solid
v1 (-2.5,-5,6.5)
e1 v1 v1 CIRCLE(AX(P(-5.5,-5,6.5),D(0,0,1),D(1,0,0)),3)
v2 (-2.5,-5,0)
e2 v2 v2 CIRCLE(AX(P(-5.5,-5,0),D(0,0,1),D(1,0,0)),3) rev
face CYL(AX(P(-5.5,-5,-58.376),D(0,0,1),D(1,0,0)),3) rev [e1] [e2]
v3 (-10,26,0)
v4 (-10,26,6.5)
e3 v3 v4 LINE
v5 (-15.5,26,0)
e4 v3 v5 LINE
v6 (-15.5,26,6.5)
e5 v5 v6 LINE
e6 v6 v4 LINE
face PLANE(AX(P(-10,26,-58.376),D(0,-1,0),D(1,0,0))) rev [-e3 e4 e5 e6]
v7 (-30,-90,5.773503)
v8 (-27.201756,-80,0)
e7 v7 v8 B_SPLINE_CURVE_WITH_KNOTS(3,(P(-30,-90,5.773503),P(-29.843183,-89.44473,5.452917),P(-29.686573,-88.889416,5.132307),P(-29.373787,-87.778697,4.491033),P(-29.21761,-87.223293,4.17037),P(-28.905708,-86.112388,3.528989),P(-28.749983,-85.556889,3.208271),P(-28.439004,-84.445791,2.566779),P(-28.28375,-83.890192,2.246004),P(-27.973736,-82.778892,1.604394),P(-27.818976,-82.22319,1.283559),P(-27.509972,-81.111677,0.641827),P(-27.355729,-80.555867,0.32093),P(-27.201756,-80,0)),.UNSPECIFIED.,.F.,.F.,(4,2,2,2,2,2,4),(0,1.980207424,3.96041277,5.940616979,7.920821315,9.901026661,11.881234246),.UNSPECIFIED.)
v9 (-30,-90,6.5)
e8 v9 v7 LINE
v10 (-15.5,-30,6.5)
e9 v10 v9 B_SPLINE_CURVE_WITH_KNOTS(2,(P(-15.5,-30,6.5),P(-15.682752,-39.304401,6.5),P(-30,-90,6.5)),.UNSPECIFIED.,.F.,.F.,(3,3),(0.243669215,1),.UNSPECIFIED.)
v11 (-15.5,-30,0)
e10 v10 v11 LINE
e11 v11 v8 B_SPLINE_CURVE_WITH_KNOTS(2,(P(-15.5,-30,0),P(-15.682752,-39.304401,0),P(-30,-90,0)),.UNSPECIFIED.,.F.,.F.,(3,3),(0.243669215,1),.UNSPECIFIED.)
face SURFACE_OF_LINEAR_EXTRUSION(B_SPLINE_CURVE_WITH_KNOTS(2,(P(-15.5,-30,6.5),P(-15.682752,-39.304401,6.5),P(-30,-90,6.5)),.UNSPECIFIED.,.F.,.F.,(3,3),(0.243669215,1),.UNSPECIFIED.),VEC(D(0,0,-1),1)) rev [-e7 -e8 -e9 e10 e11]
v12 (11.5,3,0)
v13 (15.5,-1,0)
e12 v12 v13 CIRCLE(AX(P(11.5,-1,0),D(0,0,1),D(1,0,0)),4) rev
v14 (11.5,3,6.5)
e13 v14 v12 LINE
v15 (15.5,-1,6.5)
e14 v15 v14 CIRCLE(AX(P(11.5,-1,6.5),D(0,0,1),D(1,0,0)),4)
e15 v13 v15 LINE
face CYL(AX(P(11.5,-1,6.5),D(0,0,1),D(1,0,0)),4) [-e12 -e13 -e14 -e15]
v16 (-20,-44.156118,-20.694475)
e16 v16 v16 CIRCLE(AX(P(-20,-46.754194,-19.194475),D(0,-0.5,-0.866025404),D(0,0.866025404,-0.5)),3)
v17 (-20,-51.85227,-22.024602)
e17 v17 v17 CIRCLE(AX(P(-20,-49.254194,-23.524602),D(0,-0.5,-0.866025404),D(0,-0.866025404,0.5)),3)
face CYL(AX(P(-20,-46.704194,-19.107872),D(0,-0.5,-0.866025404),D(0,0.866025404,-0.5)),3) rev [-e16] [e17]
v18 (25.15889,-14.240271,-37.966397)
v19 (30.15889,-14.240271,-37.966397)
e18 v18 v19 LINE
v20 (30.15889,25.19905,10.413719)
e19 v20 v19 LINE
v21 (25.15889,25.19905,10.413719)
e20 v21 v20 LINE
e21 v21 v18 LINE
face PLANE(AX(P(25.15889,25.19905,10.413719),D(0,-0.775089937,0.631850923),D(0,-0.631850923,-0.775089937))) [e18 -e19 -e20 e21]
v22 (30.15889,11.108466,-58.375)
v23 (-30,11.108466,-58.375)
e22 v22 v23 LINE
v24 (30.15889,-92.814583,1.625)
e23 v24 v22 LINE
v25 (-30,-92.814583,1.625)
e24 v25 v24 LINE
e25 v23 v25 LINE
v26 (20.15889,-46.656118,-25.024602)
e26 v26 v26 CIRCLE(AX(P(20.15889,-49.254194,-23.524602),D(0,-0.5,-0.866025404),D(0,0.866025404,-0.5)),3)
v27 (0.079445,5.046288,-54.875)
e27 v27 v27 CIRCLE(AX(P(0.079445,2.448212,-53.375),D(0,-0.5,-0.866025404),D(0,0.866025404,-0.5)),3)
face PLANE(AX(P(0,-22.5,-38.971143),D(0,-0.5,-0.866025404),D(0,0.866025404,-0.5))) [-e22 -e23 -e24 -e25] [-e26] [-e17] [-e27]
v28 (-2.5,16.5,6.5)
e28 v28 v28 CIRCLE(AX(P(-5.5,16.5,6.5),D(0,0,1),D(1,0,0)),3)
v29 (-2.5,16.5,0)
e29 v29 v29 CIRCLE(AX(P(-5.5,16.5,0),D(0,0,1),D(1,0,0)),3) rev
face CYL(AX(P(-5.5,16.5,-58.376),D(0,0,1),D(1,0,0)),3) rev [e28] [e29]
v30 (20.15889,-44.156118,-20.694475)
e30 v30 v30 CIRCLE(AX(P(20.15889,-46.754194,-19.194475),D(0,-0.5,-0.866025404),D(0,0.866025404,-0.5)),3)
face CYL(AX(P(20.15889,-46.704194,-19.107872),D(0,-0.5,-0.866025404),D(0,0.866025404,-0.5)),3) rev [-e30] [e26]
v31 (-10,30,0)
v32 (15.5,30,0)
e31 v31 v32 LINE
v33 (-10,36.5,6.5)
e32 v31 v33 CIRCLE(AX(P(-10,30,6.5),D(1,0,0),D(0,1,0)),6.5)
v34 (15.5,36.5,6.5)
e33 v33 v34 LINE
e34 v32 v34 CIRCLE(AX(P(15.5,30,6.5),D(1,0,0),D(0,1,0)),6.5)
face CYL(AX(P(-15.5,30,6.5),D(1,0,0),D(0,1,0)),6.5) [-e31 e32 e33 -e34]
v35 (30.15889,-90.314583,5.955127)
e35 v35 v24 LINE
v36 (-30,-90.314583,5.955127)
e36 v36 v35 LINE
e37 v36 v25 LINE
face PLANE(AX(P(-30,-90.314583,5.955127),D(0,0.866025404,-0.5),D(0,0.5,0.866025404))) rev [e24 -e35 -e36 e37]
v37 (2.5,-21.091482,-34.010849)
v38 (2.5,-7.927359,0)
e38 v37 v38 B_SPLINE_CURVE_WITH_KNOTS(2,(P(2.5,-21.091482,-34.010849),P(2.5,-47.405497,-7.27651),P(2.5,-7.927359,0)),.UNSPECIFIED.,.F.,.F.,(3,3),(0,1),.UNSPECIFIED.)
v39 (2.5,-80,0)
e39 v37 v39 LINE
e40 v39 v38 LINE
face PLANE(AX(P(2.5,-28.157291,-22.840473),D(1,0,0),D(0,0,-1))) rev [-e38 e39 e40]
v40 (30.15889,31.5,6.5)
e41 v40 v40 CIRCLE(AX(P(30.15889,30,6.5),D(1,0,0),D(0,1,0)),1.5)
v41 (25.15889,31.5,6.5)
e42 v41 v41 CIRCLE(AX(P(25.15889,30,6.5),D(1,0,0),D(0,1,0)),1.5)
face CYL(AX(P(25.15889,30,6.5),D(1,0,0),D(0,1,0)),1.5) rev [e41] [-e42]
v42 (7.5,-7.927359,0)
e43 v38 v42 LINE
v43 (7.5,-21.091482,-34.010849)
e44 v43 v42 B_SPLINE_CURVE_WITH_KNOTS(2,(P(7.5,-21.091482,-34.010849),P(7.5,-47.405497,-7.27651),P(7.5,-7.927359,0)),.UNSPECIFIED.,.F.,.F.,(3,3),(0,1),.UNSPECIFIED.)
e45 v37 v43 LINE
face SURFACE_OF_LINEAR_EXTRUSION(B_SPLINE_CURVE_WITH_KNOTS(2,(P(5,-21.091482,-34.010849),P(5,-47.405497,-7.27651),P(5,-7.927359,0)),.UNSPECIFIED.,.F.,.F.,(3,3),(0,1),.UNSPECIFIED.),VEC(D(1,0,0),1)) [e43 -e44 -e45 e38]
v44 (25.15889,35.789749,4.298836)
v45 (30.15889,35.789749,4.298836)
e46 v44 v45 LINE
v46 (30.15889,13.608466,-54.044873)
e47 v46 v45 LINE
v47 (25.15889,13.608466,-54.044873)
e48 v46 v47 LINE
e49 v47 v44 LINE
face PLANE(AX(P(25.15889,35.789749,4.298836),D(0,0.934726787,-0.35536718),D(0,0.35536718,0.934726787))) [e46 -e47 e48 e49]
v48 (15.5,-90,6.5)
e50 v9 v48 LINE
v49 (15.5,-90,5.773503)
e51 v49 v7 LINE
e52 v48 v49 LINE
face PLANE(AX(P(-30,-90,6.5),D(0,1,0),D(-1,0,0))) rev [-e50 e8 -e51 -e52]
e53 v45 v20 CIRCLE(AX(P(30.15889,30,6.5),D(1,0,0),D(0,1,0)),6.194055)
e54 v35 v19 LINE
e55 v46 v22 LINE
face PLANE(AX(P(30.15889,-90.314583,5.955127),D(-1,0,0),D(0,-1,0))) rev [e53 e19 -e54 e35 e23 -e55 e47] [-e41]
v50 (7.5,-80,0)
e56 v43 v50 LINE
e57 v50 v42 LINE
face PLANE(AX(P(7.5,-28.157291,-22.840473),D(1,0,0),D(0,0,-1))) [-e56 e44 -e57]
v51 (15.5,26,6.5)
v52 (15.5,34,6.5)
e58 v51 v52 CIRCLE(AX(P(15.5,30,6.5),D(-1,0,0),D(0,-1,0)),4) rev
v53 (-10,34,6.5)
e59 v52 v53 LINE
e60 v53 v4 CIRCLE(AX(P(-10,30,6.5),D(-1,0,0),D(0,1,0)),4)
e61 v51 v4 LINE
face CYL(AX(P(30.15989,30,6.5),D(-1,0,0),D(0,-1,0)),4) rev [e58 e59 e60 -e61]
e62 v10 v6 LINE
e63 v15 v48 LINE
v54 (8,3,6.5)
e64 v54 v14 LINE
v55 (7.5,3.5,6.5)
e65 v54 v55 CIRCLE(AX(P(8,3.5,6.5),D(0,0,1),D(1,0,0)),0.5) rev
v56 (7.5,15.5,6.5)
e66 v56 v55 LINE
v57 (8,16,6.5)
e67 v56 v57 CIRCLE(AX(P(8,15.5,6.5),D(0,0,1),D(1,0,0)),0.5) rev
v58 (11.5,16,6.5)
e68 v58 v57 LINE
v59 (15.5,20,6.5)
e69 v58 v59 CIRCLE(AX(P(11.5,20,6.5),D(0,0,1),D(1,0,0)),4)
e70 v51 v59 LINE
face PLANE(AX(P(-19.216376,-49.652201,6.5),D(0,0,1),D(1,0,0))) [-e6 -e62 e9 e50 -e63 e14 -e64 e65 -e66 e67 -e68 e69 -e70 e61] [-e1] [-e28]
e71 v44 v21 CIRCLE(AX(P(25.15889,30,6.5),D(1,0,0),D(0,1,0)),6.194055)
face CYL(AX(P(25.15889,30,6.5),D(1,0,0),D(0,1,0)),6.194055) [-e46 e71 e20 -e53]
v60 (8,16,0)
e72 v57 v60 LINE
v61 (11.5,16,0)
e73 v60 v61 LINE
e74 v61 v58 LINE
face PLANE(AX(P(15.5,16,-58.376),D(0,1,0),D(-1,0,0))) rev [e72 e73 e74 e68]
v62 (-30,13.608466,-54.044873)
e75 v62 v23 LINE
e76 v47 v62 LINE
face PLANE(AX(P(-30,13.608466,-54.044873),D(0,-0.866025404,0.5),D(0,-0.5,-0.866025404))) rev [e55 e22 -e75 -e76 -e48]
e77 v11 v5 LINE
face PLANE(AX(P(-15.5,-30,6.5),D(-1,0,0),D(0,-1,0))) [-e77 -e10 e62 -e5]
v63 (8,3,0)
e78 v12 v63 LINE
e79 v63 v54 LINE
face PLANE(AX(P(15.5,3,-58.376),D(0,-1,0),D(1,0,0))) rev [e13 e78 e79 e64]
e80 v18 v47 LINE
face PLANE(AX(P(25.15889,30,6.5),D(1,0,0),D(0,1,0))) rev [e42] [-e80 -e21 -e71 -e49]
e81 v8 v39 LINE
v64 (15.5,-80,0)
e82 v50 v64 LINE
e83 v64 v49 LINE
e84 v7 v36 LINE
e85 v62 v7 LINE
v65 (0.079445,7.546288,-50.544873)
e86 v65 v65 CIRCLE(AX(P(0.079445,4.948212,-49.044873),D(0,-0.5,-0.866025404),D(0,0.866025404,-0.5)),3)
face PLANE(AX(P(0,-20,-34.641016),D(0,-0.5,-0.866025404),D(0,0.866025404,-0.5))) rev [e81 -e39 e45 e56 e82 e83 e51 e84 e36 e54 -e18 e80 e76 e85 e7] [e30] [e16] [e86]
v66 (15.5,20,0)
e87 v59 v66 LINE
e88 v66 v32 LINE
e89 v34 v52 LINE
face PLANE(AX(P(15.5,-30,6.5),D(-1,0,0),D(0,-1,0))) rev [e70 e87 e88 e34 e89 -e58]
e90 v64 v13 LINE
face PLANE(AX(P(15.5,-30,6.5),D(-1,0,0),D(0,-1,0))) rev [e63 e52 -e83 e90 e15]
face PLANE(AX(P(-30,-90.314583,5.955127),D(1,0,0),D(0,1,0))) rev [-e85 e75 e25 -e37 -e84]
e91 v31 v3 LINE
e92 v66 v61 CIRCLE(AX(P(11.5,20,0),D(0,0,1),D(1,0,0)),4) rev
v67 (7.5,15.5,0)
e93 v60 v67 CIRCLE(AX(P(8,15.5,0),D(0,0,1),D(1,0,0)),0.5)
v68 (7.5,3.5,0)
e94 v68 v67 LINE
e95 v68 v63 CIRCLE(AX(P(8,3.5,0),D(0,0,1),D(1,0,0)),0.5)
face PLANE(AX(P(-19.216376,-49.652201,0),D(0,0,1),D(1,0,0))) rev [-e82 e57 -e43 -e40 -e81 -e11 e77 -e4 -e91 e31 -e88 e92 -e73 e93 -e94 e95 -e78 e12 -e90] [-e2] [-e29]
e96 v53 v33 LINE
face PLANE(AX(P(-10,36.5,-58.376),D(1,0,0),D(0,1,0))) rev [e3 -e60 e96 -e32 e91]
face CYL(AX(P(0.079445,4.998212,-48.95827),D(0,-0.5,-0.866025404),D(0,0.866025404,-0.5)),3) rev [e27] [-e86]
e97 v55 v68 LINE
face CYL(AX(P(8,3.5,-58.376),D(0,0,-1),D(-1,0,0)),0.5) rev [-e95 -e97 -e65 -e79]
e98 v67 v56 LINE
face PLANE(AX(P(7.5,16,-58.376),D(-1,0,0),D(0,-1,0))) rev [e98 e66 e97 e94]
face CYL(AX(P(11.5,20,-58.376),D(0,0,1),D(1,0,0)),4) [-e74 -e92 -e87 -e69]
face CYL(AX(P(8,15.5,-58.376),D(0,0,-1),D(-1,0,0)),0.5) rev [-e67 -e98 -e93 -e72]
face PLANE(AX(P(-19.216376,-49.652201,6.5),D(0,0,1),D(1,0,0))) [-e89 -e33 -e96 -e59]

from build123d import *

# Parameters (mm, degrees)
BOSS_EXTRUDE1_DEPTH = 6.5
SKETCH2_W           = 60.158889846
SKETCH2_H           = 120
BOSS_EXTRUDE3_DEPTH = 5
SKETCH6_R           = 3
CUT_EXTRUDE7_DEPTH  = 5.1
BOSS_EXTRUDE4_DEPTH = 31
CUT_EXTRUDE8_REACH  = 119.187
SKETCH11_W          = 5.5
SKETCH11_H          = 10.5
CUT_EXTRUDE11_REACH = 119.187
SKETCH14_R          = 3
SKETCH29_R          = 1.5
BOSS_EXTRUDE6_DEPTH = 5
RIB6_START          = -2.5
RIB6_DEPTH          = 5
CUT_EXTRUDE14_REACH = 118.769
CUT_EXTRUDE15_REACH = 119.187
SKETCH66_W          = 8
SKETCH66_H          = 13
FILLET3_R           = 4
FILLET4_R           = 0.5


# Read off the part's stored shape, not the designer's step: Rib6
with BuildPart() as part:
    # Sketch1 → Boss-Extrude1 (new body)
    with BuildSketch(Plane.XY):
        with BuildLine():
            Line((-15.5, -30), (-15.5, 30))
            Line((-15.5, 30), (15.5, 30))
            Line((15.5, 30), (15.5, -30))
            Line((15.5, -30), (15.5, -90))
            Line((15.5, -90), (-30, -90))
            add(Edge.make_bspline(
                [(-15.5, -30), (-15.682751911, -39.304401058), (-30, -90)],
                knots=[0.243669215, 0.243669215, 0.243669215, 1, 1, 1], degree=2))
        make_face()
    extrude(amount=BOSS_EXTRUDE1_DEPTH)

    # Sketch2 → Boss-Extrude3 (add)
    with BuildSketch(Plane(origin=(0, -22.5, -38.97114317), x_dir=(1, 0, 0), z_dir=(0, 0.500000000000001, 0.866025403784438))):
        with Locations((0.079444923, -21.192286341)):
            Rectangle(SKETCH2_W, SKETCH2_H)
    extrude(amount=BOSS_EXTRUDE3_DEPTH)

    # Sketch6 → Cut-Extrude7 (cut)
    with BuildSketch(Plane(origin=(0, -22.5, -38.97114317), x_dir=(-1, 0, 0), z_dir=(0, -0.5000000000000012, -0.866025403784438))):
        with Locations(Location((-20.158889846, -30.893082241, 0), (0, 0, 90))):
            Circle(SKETCH6_R)
        with Locations(Location((20, -30.893082241, 0), (0, 0, 90))):
            Circle(SKETCH6_R)
        with Locations(Location((-0.079444923, 28.807713659, 0), (0, 0, 90))):
            Circle(SKETCH6_R)
    extrude(amount=-CUT_EXTRUDE7_DEPTH, mode=Mode.SUBTRACT)

    # Sketch10 → Boss-Extrude4 (add)
    with BuildSketch(Plane(origin=(15.5, 0, 0), x_dir=(0, 0, -1), z_dir=(1, 0, 0))):
        with BuildLine():
            Line((-6.5, 36.5), (-6.5, 30))
            Line((-6.5, 30), (0, 30))
            ThreePointArc((0, 30), (-1.903805922, 34.596194078), (-6.5, 36.5))
        make_face()
    extrude(amount=-BOSS_EXTRUDE4_DEPTH)

    # Sketch11 → Cut-Extrude8 (cut, up to next)
    with BuildSketch(Plane.XY.offset(6.5), mode=Mode.PRIVATE) as cut_extrude8_sk1:
        with Locations((-12.75, 31.25)):
            Rectangle(SKETCH11_W, SKETCH11_H)
    cut_extrude8_tool1 = extrude(cut_extrude8_sk1.sketch, amount=-CUT_EXTRUDE8_REACH, mode=Mode.PRIVATE) & part.part
    add(cut_extrude8_tool1.solids().sort_by_distance((-12.75, 31.25, 6.5))[0], mode=Mode.SUBTRACT)

    # Sketch14 → Cut-Extrude11 (cut, up to next)
    with BuildSketch(Plane.XY.offset(6.5), mode=Mode.PRIVATE) as cut_extrude11_sk1:
        with Locations((-5.5, 16.5)):
            Circle(SKETCH14_R)
    cut_extrude11_tool1 = extrude(cut_extrude11_sk1.sketch, amount=-CUT_EXTRUDE11_REACH, mode=Mode.PRIVATE) & part.part
    # Sketch14 → Cut-Extrude11 (cut, up to next)
    with BuildSketch(Plane.XY.offset(6.5), mode=Mode.PRIVATE) as cut_extrude11_sk2:
        with Locations((-5.5, -5)):
            Circle(SKETCH14_R)
    cut_extrude11_tool2 = extrude(cut_extrude11_sk2.sketch, amount=-CUT_EXTRUDE11_REACH, mode=Mode.PRIVATE) & part.part
    add(cut_extrude11_tool1.solids().sort_by_distance((-5.5, 16.5, 6.5))[0], mode=Mode.SUBTRACT)
    add(cut_extrude11_tool2.solids().sort_by_distance((-5.5, -5, 6.5))[0], mode=Mode.SUBTRACT)

    # Sketch29 → Boss-Extrude6 (add)
    with BuildSketch(Plane(origin=(30.158889846, 0, 0), x_dir=(0, 0, -1), z_dir=(1, 0, 0))):
        with BuildLine():
            Line((-4.298836218, 35.789748924), (54.044872981, 13.608465892))
            Line((54.044872981, 13.608465892), (37.966397208, -14.240271055))
            Line((37.966397208, -14.240271055), (-10.413719231, 25.199050471))
            ThreePointArc((-10.413719231, 25.199050471), (-11.864134131, 33.0971567), (-4.298836218, 35.789748924))
        make_face()
        with Locations(Location((-6.5, 30, 0), (0, 0, 90))):
            Circle(SKETCH29_R, mode=Mode.SUBTRACT)
    extrude(amount=-BOSS_EXTRUDE6_DEPTH)

    # Rib6 outline → Rib6 (add)
    with BuildSketch(Plane(origin=(5, 0, 0), x_dir=(0, 0, -1), z_dir=(1, 0, 0)).offset(RIB6_START)):
        with BuildLine():
            Line((0, -80), (34.010848977, -21.091481564))
            add(Edge.make_bspline(
                [(34.010848977, -21.091481564), (7.27651008, -47.405497337), (0, -7.927359395)],
                knots=[0, 0, 0, 1, 1, 1], degree=2))
            Line((0, -7.927359395), (0, -80))
        make_face()
    extrude(amount=RIB6_DEPTH)

    # Sketch65 → Cut-Extrude14 (cut, up to next)
    with BuildSketch(Plane.ZY.offset(10), mode=Mode.PRIVATE) as cut_extrude14_sk1:
        with BuildLine():
            Line((6.5, 34), (6.5, 26))
            ThreePointArc((6.5, 26), (2.5, 30), (6.5, 34))
        make_face()
    cut_extrude14_tool1 = extrude(cut_extrude14_sk1.sketch, amount=-CUT_EXTRUDE14_REACH, mode=Mode.PRIVATE) & part.part
    add(cut_extrude14_tool1.solids().sort_by_distance((-10, 30, 4.802347))[0], mode=Mode.SUBTRACT)

    # Sketch66 → Cut-Extrude15 (cut, up to next)
    with BuildSketch(Plane.XY.offset(6.5), mode=Mode.PRIVATE) as cut_extrude15_sk1:
        with Locations((11.5, 9.5)):
            Rectangle(SKETCH66_W, SKETCH66_H)
    cut_extrude15_tool1 = extrude(cut_extrude15_sk1.sketch, amount=-CUT_EXTRUDE15_REACH, mode=Mode.PRIVATE) & part.part
    add(cut_extrude15_tool1.solids().sort_by_distance((11.5, 9.5, 6.5))[0], mode=Mode.SUBTRACT)

    # Fillet3
    fillet3_edges = [part.edges().sort_by_distance(p)[0] for p in [
        (15.5, 16, 3.25),
        (15.5, 3, 3.25),
    ]]
    fillet(fillet3_edges, radius=FILLET3_R)

    # Fillet4
    fillet4_edges = [part.edges().sort_by_distance(p)[0] for p in [
        (7.5, 3, 3.25),
        (7.5, 16, 3.25),
    ]]
    fillet(fillet4_edges, radius=FILLET4_R)


solid = part.part
